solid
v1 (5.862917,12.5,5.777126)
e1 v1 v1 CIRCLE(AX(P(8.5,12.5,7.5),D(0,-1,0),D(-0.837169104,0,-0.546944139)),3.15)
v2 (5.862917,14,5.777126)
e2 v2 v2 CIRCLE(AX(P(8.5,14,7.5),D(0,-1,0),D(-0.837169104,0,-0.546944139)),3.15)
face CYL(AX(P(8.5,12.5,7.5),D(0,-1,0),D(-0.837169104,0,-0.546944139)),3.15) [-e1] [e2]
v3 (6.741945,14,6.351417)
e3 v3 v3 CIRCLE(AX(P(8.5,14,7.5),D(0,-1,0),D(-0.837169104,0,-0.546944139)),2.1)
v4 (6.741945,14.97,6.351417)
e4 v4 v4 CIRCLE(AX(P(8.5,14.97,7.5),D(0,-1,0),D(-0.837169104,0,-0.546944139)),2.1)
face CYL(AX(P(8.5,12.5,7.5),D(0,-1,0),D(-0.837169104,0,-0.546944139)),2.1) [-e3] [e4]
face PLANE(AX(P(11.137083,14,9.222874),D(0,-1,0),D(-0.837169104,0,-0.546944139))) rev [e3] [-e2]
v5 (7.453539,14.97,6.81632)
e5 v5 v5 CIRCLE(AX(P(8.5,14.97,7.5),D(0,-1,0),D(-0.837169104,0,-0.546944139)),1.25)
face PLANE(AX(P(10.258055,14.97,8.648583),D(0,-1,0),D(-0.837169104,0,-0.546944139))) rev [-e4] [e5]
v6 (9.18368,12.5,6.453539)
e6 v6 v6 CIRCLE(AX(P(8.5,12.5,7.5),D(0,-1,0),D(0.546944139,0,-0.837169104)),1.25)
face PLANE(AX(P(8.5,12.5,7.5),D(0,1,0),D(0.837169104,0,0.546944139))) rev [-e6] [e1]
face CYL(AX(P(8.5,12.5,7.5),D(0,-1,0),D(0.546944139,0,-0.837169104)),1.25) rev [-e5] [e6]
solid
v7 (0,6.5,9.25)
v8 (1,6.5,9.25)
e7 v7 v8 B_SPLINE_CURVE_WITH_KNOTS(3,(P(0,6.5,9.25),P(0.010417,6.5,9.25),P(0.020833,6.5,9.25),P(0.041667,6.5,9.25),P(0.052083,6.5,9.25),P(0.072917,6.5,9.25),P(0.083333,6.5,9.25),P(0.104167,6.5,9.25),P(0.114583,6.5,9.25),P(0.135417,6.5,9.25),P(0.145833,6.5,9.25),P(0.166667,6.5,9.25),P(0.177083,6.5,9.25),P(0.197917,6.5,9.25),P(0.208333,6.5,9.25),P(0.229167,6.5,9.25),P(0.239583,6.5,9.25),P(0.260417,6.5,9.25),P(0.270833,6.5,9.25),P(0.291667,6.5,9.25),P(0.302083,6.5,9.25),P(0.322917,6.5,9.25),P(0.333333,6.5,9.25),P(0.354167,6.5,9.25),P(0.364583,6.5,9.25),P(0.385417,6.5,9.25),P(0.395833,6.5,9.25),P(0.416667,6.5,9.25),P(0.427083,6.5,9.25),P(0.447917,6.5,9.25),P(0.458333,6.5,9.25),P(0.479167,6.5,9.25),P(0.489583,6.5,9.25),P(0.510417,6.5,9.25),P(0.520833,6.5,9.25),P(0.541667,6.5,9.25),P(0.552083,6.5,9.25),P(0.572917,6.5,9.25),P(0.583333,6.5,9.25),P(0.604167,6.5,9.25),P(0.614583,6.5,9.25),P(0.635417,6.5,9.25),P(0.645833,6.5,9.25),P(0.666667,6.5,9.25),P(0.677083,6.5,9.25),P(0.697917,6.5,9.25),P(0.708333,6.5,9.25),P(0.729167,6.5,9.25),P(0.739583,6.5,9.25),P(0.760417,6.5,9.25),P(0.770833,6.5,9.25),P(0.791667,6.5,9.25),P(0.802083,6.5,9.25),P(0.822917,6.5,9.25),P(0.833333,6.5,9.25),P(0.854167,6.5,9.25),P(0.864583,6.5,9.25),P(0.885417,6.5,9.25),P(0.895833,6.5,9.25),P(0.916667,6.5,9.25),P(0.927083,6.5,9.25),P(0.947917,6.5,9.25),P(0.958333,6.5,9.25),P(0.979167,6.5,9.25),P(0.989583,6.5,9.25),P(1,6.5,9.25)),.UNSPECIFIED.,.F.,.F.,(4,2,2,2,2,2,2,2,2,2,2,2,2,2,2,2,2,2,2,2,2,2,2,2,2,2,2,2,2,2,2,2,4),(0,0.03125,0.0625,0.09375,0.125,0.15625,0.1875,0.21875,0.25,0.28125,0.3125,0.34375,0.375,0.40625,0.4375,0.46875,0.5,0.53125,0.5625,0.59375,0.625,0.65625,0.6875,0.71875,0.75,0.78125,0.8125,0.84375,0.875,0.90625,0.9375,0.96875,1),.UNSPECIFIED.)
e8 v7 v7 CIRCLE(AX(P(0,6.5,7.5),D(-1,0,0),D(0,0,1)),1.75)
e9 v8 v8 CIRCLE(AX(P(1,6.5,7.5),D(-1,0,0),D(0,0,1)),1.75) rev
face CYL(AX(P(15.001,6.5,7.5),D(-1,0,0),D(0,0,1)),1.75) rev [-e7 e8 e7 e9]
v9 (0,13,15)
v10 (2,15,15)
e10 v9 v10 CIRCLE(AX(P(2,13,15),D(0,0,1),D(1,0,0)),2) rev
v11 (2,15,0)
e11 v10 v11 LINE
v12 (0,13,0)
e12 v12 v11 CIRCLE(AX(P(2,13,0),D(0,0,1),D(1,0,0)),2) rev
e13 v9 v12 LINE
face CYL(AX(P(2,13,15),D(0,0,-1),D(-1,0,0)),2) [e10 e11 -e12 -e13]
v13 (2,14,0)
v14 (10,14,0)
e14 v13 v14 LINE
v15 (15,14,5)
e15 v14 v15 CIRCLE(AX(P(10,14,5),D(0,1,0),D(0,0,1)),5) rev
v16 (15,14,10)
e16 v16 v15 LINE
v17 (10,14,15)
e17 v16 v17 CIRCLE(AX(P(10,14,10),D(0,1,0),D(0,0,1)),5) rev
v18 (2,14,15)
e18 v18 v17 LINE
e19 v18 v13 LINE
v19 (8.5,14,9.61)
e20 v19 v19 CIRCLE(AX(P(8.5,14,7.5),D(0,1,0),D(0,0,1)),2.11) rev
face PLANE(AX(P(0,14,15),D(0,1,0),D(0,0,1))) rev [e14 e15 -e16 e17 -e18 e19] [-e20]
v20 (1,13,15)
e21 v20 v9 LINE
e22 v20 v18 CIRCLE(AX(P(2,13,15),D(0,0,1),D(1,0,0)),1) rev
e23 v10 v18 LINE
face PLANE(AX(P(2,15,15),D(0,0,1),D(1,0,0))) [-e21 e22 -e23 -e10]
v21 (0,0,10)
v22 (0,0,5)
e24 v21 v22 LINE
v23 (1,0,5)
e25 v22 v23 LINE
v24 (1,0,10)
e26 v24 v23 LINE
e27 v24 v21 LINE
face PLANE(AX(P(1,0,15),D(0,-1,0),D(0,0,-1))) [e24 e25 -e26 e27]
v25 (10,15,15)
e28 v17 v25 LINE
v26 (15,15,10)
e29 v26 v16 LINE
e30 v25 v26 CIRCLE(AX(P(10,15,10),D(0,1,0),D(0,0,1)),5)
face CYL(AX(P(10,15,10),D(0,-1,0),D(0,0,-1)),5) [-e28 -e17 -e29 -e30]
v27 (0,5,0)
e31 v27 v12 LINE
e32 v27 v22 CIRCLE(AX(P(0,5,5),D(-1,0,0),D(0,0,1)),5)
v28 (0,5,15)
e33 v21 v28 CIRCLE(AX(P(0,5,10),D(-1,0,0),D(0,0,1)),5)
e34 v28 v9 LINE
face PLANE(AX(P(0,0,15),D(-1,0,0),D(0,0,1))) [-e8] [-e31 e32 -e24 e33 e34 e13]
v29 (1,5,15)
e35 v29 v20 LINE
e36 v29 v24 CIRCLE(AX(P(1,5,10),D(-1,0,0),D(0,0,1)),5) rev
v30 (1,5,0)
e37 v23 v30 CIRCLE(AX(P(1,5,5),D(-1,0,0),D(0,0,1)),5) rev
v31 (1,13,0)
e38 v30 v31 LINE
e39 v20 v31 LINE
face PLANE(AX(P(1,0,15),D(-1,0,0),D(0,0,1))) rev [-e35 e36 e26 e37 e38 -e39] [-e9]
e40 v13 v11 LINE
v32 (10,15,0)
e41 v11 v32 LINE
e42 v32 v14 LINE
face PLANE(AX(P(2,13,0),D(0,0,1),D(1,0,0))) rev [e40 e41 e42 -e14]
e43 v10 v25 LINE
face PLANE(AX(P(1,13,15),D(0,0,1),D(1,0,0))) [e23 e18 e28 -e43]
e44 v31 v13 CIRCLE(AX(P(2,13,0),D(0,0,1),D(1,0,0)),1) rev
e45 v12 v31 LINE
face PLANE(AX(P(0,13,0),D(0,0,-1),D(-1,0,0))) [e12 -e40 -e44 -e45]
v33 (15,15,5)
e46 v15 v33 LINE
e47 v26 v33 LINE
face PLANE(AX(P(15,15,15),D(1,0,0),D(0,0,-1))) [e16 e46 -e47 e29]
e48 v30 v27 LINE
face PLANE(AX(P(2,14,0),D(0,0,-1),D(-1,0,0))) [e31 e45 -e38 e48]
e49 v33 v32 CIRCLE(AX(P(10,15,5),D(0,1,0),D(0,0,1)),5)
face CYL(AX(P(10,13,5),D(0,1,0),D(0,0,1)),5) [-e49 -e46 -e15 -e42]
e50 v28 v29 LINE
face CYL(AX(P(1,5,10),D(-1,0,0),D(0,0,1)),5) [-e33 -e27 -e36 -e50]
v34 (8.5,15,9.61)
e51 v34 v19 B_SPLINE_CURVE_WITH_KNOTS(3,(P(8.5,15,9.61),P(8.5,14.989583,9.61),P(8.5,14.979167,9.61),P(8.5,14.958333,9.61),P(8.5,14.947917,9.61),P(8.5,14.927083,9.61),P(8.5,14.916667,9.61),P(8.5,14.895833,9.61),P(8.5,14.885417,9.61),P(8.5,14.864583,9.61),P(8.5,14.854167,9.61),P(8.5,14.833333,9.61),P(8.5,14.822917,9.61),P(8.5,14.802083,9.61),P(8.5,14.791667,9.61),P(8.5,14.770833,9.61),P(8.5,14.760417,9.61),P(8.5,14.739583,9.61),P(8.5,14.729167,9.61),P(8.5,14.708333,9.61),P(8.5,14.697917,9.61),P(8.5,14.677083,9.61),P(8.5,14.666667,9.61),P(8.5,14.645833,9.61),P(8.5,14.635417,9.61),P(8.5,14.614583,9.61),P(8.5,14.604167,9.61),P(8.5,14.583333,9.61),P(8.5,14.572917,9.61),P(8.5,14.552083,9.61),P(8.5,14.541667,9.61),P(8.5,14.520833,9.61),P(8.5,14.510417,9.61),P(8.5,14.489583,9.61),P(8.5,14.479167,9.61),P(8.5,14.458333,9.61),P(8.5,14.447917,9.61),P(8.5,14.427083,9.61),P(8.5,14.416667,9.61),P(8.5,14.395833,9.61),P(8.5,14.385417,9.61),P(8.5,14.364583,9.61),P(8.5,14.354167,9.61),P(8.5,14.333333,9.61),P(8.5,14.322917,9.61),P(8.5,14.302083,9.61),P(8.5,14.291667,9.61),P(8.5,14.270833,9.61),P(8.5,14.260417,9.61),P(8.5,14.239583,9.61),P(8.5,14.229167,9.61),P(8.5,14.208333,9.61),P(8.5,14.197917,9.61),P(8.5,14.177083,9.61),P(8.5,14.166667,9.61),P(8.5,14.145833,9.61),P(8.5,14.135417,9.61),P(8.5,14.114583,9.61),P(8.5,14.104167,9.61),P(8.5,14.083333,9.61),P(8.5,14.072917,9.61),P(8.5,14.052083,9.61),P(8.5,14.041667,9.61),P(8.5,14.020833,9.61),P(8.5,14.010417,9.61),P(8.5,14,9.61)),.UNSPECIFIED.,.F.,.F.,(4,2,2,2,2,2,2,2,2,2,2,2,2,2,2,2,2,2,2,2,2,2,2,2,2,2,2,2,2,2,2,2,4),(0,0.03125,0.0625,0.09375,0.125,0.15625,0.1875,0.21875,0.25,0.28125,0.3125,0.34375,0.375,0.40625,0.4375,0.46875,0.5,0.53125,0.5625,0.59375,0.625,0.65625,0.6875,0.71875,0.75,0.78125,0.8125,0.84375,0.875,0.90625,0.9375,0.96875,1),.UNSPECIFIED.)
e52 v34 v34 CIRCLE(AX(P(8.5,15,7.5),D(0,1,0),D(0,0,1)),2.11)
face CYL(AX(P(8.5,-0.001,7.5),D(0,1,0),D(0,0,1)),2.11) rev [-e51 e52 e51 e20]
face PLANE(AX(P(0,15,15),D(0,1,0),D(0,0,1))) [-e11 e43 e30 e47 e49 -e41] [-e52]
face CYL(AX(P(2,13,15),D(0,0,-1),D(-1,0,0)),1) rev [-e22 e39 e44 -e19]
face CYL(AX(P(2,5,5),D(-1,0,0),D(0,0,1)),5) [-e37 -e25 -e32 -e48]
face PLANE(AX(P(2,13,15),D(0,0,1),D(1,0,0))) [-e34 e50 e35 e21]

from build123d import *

# Parameters (mm, degrees)
BRIDA_BASE1_DEPTH          = 15
CORTAR_EXTRUIR1_REACH      = 27.981
CROQUIS2_R                 = 2.11
CORTAR_EXTRUIR2_REACH      = 27.981
CROQUIS3_R                 = 1.75
REDONDEO1_R                = 5
S_M3_1_START               = 6.057083137
S_M3_1_OUTLINE_R           = 3.15
S_M3_1_OUTLINE_R_2         = 1.25
S_M3_1_DEPTH               = 1.5
S_M3_1_START_2             = 5.087083137
S_M3_1_2_OUTLINE_R         = 2.1
S_M3_1_2_OUTLINE_R_2       = 1.25
S_M3_1_2_DEPTH             = 0.97
S_LIDO_MOVER_COPIAR2_ANGLE = 180


with BuildPart() as part:
    # Brida base1: sheet metal written as solids
    # Croquis1 → Brida base1 (new body)
    with BuildSketch(Plane.XY):
        with BuildLine():
            Line((0, 0), (0, 13))
            ThreePointArc((0, 13), (0.585786438, 14.414213562), (2, 15))
            Line((2, 15), (15, 15))
            Line((15, 15), (15, 14))
            Line((15, 14), (2, 14))
            ThreePointArc((2, 14), (1.292893219, 13.707106781), (1, 13))
            Line((1, 13), (1, 0))
            Line((1, 0), (0, 0))
        make_face()
    extrude(amount=BRIDA_BASE1_DEPTH)

    # Croquis2 → Cortar-Extruir1 (cut, up to next)
    with BuildSketch(Plane(origin=(0, 15, 0), x_dir=(1, 0, 0), z_dir=(0, 1, 0)), mode=Mode.PRIVATE) as cortar_extruir1_sk1:
        with Locations(Location((8.5, -7.5, 0), (0, 0, 270))):
            Circle(CROQUIS2_R)
    cortar_extruir1_tool1 = extrude(cortar_extruir1_sk1.sketch, amount=-CORTAR_EXTRUIR1_REACH, mode=Mode.PRIVATE) & part.part
    add(cortar_extruir1_tool1.solids().sort_by_distance((8.5, 15, 7.5))[0], mode=Mode.SUBTRACT)

    # Croquis3 → Cortar-Extruir2 (cut, up to next)
    with BuildSketch(Plane.ZY, mode=Mode.PRIVATE) as cortar_extruir2_sk1:
        with Locations((7.5, 6.5)):
            Circle(CROQUIS3_R)
    cortar_extruir2_tool1 = extrude(cortar_extruir2_sk1.sketch, amount=-CORTAR_EXTRUIR2_REACH, mode=Mode.PRIVATE) & part.part
    add(cortar_extruir2_tool1.solids().sort_by_distance((0, 6.5, 7.5))[0], mode=Mode.SUBTRACT)

    # Redondeo1
    redondeo1_edges = [part.edges().sort_by_distance(p)[0] for p in [
        (0.5, 0, 15),
        (15, 14.5, 15),
        (0.5, 0, 0),
        (15, 14.5, 0),
    ]]
    fillet(redondeo1_edges, radius=REDONDEO1_R)


with BuildPart() as body_2:
    # S-M3-1: read off the stored shape, not the designer's step
    # S-M3-1 outline → S-M3-1 (new body)
    with BuildSketch(Plane(origin=(0, 0, 0), x_dir=(1, 0, 0), z_dir=(0, 1, 0)).offset(S_M3_1_START)):
        with Locations((5.193353816, 2.598352405)):
            Circle(S_M3_1_OUTLINE_R)
        with Locations((5.193353816, 2.598352405)):
            Circle(S_M3_1_OUTLINE_R_2, mode=Mode.SUBTRACT)
    extrude(amount=S_M3_1_DEPTH)

    # S-M3-1 2 outline → S-M3-1 2 (add)
    with BuildSketch(Plane(origin=(0, 0, 0), x_dir=(1, 0, 0), z_dir=(0, 1, 0)).offset(S_M3_1_START_2)):
        with Locations((5.193353816, 2.598352405)):
            Circle(S_M3_1_2_OUTLINE_R)
        with Locations((5.193353816, 2.598352405)):
            Circle(S_M3_1_2_OUTLINE_R_2, mode=Mode.SUBTRACT)
    extrude(amount=S_M3_1_2_DEPTH)


with BuildPart() as body_2_1:
    # Sólido-Mover/Copiar2: read off the stored shape, not the designer's step
    # Sólido-Mover/Copiar2: moved
    add(body_2.part.moved(Location((6.0246646, -20.0570831, 0.9686093))).rotate(Axis((0, 0, 0), (0.9584281675, 0, 0.2853339234)), S_LIDO_MOVER_COPIAR2_ANGLE))


solid = Compound([part.part, body_2_1.part])
